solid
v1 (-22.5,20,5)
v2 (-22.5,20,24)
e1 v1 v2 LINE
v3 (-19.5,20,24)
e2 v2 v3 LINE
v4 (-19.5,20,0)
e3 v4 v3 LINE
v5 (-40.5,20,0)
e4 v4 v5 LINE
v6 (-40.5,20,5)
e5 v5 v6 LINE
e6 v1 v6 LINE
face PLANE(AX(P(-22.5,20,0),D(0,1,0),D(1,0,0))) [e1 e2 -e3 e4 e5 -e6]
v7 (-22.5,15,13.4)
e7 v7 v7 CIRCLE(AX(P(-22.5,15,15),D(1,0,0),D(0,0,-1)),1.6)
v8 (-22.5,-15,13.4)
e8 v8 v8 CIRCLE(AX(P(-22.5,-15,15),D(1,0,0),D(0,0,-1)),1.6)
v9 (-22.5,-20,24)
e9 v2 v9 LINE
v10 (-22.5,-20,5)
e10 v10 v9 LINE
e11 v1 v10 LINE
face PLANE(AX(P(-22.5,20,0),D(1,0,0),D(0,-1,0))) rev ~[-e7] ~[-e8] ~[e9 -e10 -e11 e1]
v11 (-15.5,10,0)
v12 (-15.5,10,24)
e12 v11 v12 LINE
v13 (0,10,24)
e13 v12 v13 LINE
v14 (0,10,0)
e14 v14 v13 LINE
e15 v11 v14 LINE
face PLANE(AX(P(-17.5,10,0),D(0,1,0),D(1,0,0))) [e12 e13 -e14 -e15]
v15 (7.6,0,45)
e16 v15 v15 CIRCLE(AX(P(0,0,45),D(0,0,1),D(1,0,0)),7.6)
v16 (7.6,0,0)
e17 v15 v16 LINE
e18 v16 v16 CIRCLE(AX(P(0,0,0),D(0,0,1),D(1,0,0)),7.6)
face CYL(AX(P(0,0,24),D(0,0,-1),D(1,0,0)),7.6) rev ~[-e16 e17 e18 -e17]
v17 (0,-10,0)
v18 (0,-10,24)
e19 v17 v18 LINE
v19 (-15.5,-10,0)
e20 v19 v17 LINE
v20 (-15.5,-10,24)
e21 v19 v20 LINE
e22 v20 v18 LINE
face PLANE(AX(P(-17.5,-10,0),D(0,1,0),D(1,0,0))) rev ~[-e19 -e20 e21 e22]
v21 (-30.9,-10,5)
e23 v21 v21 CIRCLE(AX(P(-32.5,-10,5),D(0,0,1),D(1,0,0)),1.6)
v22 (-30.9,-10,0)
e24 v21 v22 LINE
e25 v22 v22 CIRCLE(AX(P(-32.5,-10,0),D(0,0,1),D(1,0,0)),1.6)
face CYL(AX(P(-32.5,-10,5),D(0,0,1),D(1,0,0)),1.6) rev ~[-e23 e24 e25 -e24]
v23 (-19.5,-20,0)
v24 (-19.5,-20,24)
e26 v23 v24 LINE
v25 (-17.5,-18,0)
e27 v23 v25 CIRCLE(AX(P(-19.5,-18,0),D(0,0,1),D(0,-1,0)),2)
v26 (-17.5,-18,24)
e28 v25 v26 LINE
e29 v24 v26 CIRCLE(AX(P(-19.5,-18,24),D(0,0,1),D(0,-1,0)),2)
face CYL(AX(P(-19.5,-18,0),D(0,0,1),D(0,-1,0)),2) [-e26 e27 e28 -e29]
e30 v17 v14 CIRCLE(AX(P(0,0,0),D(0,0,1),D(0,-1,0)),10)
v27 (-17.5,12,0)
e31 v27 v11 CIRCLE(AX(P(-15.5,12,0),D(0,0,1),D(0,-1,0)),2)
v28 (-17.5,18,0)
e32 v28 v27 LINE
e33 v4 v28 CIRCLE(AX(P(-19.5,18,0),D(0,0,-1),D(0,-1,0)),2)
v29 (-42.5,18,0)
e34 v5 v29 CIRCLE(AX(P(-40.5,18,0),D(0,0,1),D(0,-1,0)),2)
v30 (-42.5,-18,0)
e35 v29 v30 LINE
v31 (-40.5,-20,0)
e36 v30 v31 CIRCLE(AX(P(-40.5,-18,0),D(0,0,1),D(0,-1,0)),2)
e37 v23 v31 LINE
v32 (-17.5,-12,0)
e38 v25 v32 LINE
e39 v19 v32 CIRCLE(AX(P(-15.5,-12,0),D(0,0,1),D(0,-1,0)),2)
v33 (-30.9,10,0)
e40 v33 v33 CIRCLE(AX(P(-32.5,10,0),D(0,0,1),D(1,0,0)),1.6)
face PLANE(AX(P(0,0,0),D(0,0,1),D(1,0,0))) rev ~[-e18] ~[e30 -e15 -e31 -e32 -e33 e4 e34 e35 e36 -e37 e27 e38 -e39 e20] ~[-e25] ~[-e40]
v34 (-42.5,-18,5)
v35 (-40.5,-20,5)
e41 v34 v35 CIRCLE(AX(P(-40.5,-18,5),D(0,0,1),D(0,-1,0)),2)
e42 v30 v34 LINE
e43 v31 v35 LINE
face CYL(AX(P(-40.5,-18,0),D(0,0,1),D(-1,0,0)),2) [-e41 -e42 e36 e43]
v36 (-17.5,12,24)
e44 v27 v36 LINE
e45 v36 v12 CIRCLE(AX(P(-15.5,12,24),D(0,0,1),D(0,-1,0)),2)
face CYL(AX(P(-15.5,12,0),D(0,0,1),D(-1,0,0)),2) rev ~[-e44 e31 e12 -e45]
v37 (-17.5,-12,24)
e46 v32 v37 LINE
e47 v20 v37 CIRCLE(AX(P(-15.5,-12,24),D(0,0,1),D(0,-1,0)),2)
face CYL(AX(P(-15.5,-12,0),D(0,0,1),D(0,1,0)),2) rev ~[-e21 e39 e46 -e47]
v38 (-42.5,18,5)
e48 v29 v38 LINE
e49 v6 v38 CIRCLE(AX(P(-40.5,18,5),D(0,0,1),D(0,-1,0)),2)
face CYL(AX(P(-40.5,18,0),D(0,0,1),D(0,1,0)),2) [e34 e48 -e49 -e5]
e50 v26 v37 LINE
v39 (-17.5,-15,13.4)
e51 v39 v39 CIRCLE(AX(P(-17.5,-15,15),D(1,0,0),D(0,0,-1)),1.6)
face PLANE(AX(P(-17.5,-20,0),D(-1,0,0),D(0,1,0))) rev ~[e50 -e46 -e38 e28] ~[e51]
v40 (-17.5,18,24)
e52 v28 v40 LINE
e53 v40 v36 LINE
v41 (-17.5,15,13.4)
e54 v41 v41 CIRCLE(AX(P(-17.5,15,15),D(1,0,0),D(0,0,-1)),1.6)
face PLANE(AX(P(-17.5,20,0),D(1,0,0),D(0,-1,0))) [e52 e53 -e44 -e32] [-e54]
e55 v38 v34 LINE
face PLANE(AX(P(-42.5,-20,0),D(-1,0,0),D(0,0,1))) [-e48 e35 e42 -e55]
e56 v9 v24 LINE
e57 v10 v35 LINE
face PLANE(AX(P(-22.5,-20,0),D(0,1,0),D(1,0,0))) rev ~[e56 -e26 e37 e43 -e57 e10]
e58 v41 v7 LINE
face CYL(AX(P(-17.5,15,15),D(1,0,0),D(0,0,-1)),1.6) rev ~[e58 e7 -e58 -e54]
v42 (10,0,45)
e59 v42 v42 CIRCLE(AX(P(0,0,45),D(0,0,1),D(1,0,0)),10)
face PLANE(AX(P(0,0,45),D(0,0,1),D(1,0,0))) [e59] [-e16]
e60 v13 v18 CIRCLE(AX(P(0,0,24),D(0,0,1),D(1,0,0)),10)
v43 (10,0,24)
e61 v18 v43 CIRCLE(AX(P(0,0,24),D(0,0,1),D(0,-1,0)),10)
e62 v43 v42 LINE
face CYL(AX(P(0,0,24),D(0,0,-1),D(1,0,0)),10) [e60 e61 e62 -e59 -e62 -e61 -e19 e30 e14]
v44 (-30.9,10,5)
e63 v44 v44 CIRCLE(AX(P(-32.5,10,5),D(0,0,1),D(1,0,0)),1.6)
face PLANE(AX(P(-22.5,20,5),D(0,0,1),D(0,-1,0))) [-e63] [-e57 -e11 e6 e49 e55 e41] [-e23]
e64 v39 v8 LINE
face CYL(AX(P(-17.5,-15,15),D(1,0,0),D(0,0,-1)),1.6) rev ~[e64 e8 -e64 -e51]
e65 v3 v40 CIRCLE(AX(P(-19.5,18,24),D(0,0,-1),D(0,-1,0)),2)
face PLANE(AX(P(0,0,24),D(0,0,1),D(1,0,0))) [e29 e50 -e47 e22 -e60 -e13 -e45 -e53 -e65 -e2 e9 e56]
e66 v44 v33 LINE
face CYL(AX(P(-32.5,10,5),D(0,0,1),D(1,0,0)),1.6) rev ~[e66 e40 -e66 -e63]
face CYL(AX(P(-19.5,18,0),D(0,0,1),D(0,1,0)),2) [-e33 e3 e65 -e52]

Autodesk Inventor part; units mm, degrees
ref_plane "YZ Plane" through (0, 0, 0) normal (1, 0, 0) x (0, 1, 0)
ref_plane "XZ Plane" through (0, 0, 0) normal (0, 1, 0) x (-1, 0, 0)
ref_plane "XY Plane" through (0, 0, 0) normal (0, 0, 1) x (1, 0, 0)
sketch "Skizze1" plane through (0, 0, 0) normal (0, 0, 1) x (1, 0, 0)
  circle A0 centre (0, 0) radius 7.6
  line L0 (-22.5, 20) -> (-22.5, -20)
  line L1 (-22.5, -20) -> (-17.5, -20)
  line L2 (-17.5, -20) -> (-17.5, -10)
  line L3 (-22.5, 20) -> (-17.5, 20)
  line L4 (-17.5, 20) -> (-17.5, 10)
  line L5 (-17.5, 10) -> (0, 10)
  line L6 (-17.5, -10) -> (0, -10)
  arc A1 (0, -10) -> (0, 10) centre (0, 0) ccw
  dimension "d0" = 15.2
  dimension "d23" = 5
  dimension "d24" = 10
  dimension "d25" = 5
  dimension "d26" = 10
  dimension "d27" = 40
  dimension "d28" = 20
  dimension "d38" = 22.5
extrude "Extrusion1" add sketch "Skizze1" along normal blind 24
sketch "Skizze2" plane through (-22.5, -20, 0) normal (-1, 0, 0) x (0, 0, 1)
  line L0 (0, 40) -> (0, 0) projected
  line L1 (0, 0) -> (24, 0) projected
  line L2 (0, 40) -> (5, 40)
  line L3 (5, 40) -> (5, 0)
  line L4 (5, 0) -> (0, 0)
  line L5 (0, 0) -> (0, 40)
  point P0 (0, 20)
  dimension "d12" = 5
extrude "Extrusion2" add sketch "Skizze2" along normal blind 20
sketch "Skizze3" plane through (-22.5, -20, 5) normal (0, 0, 1) x (1, 0, 0)
  circle A0 centre (-10, 30) radius 1.6
  line L0 (0, 40) -> (-20, 40) projected
  line L1 (-20, 0) -> (-20, 40) projected
  circle A1 centre (-10, 10) radius 1.6
  line L2 (0, 0) -> (-20, 0) projected
  point P0 (22.5, 20)
  dimension "d15" = 3.2
  dimension "d16" = 10
  dimension "d17" = 10
  dimension "d18" = 3.2
  dimension "d19" = 10
  dimension "d20" = 10
extrude "Extrusion3" cut sketch "Skizze3" against normal through all
fillet "Rundung1" radius 2 6 edges at (-17.5, -10, 12) (-17.5, 10, 12) (-17.5, 20, 12) (-17.5, -20, 12) (-42.5, -20, 2.5) (-42.5, 20, 2.5)
sketch "Skizze4" plane through (-17.5, -18, 0) normal (1, 0, 0) x (0, 0, -1)
  circle A0 centre (-15, 3) radius 1.6
  circle A1 centre (-15, 33) radius 1.6
  line L0 (0, 0) -> (0, 6) projected
  line L1 (-24, -2) -> (0, -2) projected
  line L2 (-5, 38) -> (-24, 38) projected
  point P0 (0, 18)
  dimension "d30" = 3.2
  dimension "d31" = 3.2
  dimension "d32" = 15
  dimension "d33" = 5
  dimension "d34" = 15
  dimension "d35" = 5
extrude "Extrusion4" cut sketch "Skizze4" against normal through all
sketch "Skizze5" plane through (0, 0, 24) normal (0, 0, 1) x (1, 0, 0)
  circle A0 centre (0, 0) radius 7.6
  circle A1 centre (0, 0) radius 10
extrude "Extrusion5" add sketch "Skizze5" along normal blind 21
properties part number "flange" material "ABS-Kunststoff"
